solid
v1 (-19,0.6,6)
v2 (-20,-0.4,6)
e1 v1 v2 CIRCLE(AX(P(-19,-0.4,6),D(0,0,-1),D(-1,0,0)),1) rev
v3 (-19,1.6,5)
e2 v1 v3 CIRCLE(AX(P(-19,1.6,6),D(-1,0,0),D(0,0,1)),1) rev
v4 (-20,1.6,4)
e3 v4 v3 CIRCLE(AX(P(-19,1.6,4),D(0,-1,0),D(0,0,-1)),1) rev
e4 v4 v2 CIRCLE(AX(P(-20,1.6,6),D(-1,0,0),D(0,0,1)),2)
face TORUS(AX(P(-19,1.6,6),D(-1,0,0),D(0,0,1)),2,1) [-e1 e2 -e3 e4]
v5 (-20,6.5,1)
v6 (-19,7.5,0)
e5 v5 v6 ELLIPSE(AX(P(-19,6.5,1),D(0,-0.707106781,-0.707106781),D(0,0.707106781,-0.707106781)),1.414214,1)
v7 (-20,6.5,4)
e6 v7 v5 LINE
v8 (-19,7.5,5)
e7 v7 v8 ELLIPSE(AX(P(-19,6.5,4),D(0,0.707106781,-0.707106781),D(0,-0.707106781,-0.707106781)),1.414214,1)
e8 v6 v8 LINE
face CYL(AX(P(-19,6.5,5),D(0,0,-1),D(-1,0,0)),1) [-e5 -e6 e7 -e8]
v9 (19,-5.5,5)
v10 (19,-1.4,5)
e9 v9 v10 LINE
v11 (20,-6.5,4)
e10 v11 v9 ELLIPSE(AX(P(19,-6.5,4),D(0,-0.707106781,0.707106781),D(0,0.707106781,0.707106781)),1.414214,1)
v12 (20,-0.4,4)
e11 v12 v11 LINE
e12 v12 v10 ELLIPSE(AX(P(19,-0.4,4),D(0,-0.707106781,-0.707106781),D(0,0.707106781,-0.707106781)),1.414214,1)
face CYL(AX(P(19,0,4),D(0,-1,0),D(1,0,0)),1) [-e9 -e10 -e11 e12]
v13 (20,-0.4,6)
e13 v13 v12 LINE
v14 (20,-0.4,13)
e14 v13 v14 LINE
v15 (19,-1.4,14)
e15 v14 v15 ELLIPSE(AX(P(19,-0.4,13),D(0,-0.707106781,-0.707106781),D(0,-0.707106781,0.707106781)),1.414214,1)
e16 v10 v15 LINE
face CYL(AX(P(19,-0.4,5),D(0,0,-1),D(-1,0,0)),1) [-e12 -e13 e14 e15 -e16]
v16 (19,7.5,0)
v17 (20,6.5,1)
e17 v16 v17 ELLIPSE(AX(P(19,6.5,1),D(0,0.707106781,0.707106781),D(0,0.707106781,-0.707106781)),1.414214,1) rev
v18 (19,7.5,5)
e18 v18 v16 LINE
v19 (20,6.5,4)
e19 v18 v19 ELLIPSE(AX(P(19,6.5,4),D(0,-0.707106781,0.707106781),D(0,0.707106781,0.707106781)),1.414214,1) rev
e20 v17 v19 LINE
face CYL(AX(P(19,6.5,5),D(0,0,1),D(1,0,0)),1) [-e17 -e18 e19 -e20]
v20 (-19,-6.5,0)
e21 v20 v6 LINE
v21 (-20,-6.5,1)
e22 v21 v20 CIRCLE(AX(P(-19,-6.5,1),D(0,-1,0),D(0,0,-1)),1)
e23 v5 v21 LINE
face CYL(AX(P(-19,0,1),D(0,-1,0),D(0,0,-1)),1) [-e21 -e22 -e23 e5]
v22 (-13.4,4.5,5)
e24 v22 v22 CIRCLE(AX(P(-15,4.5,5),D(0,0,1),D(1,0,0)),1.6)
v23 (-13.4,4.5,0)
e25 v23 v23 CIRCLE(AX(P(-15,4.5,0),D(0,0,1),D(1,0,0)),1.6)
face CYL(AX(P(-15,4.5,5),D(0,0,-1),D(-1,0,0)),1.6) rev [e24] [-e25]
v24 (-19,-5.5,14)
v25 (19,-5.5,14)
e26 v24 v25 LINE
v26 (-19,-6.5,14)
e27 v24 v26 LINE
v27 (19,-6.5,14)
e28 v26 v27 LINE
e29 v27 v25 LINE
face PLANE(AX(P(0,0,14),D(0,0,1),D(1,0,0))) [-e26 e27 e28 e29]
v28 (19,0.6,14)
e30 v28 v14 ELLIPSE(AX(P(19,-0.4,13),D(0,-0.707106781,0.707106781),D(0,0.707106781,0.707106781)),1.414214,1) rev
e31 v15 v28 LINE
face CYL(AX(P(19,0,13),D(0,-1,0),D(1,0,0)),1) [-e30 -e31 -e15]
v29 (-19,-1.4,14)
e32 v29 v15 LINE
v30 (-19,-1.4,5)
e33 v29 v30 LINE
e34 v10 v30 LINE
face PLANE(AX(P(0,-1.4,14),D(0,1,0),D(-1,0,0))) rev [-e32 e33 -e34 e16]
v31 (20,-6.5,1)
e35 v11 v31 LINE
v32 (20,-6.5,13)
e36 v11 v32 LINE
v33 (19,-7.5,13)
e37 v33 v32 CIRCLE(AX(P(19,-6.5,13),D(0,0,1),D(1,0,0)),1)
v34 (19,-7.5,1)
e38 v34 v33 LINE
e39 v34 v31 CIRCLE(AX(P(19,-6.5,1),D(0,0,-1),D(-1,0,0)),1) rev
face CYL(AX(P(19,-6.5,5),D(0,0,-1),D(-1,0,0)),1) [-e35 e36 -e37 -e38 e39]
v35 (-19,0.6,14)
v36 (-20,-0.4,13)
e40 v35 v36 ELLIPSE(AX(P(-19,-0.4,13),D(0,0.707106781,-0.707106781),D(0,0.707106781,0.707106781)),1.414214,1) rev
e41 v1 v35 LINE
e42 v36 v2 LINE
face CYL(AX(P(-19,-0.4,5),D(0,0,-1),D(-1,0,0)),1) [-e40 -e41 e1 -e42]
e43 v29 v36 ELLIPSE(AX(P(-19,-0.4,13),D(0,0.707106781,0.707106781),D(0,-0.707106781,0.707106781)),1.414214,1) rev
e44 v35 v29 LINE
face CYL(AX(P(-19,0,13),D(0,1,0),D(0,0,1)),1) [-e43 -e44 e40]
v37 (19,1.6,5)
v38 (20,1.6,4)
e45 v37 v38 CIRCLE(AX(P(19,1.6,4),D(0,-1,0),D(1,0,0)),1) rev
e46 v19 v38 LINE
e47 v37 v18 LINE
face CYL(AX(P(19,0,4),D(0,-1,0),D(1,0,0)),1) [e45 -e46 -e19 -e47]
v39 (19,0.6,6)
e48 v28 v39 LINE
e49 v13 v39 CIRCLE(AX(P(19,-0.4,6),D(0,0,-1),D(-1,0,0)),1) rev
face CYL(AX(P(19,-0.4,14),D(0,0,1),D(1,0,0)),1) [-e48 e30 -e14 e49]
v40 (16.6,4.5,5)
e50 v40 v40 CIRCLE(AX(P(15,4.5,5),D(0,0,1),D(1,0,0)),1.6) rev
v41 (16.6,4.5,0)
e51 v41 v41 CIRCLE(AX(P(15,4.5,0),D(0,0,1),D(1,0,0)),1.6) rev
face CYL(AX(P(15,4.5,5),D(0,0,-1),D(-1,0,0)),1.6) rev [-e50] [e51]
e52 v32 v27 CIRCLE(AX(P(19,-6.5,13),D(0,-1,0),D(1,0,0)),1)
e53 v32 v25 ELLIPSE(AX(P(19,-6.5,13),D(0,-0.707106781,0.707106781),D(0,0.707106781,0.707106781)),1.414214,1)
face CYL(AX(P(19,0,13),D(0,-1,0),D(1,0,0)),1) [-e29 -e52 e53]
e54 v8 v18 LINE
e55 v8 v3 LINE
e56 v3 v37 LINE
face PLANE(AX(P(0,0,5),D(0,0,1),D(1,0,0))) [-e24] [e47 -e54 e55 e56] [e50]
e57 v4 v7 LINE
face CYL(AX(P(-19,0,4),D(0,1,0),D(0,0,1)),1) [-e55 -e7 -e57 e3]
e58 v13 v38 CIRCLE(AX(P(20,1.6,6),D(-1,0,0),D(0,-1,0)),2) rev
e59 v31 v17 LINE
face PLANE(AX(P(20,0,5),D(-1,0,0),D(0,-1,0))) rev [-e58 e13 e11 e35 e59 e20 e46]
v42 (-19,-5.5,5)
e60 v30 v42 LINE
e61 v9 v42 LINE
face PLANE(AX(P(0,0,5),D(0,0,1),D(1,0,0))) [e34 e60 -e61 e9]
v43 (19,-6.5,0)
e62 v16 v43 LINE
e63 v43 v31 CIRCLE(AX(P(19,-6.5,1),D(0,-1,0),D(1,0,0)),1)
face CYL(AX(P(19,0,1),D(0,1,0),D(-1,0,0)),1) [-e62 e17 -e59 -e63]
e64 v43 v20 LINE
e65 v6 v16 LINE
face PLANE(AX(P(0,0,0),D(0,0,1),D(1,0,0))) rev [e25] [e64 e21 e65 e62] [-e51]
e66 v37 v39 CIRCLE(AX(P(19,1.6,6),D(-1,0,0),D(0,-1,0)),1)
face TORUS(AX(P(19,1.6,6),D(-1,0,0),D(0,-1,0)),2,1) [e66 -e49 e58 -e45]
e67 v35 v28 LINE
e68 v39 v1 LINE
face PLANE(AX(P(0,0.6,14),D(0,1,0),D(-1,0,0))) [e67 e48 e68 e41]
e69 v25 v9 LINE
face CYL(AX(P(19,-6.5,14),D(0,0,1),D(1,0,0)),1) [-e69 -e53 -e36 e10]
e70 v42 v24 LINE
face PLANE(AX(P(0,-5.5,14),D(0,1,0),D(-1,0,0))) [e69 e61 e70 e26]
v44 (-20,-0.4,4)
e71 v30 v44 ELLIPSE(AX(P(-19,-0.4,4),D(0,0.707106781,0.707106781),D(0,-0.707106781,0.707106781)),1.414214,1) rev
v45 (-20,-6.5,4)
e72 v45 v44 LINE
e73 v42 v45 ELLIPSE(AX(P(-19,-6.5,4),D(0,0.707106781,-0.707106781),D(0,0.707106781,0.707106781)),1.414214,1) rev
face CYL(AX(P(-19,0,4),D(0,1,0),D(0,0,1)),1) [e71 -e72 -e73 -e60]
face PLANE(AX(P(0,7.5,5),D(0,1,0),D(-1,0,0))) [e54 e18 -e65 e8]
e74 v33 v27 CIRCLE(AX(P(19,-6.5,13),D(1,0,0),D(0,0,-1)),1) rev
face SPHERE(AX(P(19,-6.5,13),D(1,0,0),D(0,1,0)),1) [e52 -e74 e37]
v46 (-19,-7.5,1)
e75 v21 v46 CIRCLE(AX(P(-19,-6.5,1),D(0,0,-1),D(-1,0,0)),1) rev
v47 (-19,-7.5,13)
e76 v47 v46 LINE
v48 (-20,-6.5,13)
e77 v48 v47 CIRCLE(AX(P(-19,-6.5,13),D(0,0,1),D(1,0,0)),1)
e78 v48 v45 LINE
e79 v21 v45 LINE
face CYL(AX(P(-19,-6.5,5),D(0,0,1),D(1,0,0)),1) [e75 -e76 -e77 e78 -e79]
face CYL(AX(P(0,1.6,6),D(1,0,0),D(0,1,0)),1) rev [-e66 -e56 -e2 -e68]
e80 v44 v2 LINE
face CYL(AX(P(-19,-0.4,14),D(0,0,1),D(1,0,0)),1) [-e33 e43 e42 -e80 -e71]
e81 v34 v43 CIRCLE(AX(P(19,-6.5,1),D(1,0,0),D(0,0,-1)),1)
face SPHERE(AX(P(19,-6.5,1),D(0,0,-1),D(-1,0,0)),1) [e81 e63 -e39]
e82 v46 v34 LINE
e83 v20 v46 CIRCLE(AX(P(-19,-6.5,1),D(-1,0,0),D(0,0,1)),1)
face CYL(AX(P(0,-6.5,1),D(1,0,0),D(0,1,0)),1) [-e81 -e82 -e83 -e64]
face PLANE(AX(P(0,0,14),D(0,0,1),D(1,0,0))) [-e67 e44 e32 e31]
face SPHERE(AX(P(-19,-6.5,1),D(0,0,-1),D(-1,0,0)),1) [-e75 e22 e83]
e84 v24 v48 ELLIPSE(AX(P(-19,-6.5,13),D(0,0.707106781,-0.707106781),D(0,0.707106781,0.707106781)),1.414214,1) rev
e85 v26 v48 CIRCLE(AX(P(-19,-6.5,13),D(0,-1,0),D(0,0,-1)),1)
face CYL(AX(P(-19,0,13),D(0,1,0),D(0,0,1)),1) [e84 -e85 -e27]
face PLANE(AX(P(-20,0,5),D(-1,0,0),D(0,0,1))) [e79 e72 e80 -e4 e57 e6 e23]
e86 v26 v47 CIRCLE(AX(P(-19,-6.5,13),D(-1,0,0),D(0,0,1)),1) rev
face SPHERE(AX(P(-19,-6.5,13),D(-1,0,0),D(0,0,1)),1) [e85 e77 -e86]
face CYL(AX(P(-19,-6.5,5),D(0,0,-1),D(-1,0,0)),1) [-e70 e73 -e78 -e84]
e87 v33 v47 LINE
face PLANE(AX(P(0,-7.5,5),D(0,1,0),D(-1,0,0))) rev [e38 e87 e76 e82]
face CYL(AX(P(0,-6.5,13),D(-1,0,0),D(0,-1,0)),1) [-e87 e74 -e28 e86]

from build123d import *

# Parameters (mm, degrees)
SKETCH2_W           = 40
SKETCH2_H           = 6.9
SKETCH2_R           = 1.6
SKETCH2_H_2         = 2
SKETCH2_H_3         = 4.1
BOSS_EXTRUDE1_DEPTH = 5
SKETCH2_3_W         = 40
SKETCH2_3_H         = 2
BOSS_EXTRUDE2_DEPTH = 14
FILLET1_R           = 1


with BuildPart() as part:
    # Sketch2 → Boss-Extrude1 (new body)
    # profile 1 of 4: a face of its own
    with BuildSketch(Plane.XY):
        with Locations((0, 4.05)):
            Rectangle(SKETCH2_W, SKETCH2_H)
        with Locations((-15, 4.5)):
            Circle(SKETCH2_R, mode=Mode.SUBTRACT)
        with Locations((15, 4.5)):
            Circle(SKETCH2_R, mode=Mode.SUBTRACT)
    # profile 2 of 4: a face of its own
    with BuildSketch(Plane.XY):
        with Locations((0, -0.4)):
            Rectangle(SKETCH2_W, SKETCH2_H_2)
    # profile 3 of 4: a face of its own
    with BuildSketch(Plane.XY):
        with Locations((0, -3.45)):
            Rectangle(SKETCH2_W, SKETCH2_H_3)
    # profile 4 of 4: a face of its own
    with BuildSketch(Plane.XY):
        with Locations((0, -6.5)):
            Rectangle(SKETCH2_W, SKETCH2_H_2)
    extrude(amount=BOSS_EXTRUDE1_DEPTH)

    # Sketch2<3> → Boss-Extrude2 (add)
    with BuildSketch(Plane.XY):
        with Locations((0, -0.4)):
            Rectangle(SKETCH2_3_W, SKETCH2_3_H)
        with Locations((0, -6.5)):
            Rectangle(SKETCH2_3_W, SKETCH2_3_H)
    extrude(amount=BOSS_EXTRUDE2_DEPTH)

    # Fillet1
    fillet1_edges = [part.edges().sort_by_distance(p)[0] for p in [
        (20, 0, 0),
        (0, -7.5, 0),
        (-20, 0, 0),
        (-20, 7.5, 2.5),
        (20, 7.5, 2.5),
        (20, -7.5, 7),
        (-20, -7.5, 7),
        (-20, 4.05, 5),
        (20, 4.05, 5),
        (-20, 0.6, 9.5),
        (-20, -0.4, 14),
        (-20, -1.4, 9.5),
        (20, -1.4, 9.5),
        (20, 0.6, 9.5),
        (0, 0.6, 5),
        (20, -0.4, 14),
        (20, -3.45, 5),
        (-20, -3.45, 5),
        (20, -5.5, 9.5),
        (-20, -5.5, 9.5),
        (-20, -6.5, 14),
        (0, -7.5, 14),
        (20, -6.5, 14),
    ]]
    fillet(fillet1_edges, radius=FILLET1_R - 0.0001)  # a hair under: the kernel refuses the full size


solid = part.part
